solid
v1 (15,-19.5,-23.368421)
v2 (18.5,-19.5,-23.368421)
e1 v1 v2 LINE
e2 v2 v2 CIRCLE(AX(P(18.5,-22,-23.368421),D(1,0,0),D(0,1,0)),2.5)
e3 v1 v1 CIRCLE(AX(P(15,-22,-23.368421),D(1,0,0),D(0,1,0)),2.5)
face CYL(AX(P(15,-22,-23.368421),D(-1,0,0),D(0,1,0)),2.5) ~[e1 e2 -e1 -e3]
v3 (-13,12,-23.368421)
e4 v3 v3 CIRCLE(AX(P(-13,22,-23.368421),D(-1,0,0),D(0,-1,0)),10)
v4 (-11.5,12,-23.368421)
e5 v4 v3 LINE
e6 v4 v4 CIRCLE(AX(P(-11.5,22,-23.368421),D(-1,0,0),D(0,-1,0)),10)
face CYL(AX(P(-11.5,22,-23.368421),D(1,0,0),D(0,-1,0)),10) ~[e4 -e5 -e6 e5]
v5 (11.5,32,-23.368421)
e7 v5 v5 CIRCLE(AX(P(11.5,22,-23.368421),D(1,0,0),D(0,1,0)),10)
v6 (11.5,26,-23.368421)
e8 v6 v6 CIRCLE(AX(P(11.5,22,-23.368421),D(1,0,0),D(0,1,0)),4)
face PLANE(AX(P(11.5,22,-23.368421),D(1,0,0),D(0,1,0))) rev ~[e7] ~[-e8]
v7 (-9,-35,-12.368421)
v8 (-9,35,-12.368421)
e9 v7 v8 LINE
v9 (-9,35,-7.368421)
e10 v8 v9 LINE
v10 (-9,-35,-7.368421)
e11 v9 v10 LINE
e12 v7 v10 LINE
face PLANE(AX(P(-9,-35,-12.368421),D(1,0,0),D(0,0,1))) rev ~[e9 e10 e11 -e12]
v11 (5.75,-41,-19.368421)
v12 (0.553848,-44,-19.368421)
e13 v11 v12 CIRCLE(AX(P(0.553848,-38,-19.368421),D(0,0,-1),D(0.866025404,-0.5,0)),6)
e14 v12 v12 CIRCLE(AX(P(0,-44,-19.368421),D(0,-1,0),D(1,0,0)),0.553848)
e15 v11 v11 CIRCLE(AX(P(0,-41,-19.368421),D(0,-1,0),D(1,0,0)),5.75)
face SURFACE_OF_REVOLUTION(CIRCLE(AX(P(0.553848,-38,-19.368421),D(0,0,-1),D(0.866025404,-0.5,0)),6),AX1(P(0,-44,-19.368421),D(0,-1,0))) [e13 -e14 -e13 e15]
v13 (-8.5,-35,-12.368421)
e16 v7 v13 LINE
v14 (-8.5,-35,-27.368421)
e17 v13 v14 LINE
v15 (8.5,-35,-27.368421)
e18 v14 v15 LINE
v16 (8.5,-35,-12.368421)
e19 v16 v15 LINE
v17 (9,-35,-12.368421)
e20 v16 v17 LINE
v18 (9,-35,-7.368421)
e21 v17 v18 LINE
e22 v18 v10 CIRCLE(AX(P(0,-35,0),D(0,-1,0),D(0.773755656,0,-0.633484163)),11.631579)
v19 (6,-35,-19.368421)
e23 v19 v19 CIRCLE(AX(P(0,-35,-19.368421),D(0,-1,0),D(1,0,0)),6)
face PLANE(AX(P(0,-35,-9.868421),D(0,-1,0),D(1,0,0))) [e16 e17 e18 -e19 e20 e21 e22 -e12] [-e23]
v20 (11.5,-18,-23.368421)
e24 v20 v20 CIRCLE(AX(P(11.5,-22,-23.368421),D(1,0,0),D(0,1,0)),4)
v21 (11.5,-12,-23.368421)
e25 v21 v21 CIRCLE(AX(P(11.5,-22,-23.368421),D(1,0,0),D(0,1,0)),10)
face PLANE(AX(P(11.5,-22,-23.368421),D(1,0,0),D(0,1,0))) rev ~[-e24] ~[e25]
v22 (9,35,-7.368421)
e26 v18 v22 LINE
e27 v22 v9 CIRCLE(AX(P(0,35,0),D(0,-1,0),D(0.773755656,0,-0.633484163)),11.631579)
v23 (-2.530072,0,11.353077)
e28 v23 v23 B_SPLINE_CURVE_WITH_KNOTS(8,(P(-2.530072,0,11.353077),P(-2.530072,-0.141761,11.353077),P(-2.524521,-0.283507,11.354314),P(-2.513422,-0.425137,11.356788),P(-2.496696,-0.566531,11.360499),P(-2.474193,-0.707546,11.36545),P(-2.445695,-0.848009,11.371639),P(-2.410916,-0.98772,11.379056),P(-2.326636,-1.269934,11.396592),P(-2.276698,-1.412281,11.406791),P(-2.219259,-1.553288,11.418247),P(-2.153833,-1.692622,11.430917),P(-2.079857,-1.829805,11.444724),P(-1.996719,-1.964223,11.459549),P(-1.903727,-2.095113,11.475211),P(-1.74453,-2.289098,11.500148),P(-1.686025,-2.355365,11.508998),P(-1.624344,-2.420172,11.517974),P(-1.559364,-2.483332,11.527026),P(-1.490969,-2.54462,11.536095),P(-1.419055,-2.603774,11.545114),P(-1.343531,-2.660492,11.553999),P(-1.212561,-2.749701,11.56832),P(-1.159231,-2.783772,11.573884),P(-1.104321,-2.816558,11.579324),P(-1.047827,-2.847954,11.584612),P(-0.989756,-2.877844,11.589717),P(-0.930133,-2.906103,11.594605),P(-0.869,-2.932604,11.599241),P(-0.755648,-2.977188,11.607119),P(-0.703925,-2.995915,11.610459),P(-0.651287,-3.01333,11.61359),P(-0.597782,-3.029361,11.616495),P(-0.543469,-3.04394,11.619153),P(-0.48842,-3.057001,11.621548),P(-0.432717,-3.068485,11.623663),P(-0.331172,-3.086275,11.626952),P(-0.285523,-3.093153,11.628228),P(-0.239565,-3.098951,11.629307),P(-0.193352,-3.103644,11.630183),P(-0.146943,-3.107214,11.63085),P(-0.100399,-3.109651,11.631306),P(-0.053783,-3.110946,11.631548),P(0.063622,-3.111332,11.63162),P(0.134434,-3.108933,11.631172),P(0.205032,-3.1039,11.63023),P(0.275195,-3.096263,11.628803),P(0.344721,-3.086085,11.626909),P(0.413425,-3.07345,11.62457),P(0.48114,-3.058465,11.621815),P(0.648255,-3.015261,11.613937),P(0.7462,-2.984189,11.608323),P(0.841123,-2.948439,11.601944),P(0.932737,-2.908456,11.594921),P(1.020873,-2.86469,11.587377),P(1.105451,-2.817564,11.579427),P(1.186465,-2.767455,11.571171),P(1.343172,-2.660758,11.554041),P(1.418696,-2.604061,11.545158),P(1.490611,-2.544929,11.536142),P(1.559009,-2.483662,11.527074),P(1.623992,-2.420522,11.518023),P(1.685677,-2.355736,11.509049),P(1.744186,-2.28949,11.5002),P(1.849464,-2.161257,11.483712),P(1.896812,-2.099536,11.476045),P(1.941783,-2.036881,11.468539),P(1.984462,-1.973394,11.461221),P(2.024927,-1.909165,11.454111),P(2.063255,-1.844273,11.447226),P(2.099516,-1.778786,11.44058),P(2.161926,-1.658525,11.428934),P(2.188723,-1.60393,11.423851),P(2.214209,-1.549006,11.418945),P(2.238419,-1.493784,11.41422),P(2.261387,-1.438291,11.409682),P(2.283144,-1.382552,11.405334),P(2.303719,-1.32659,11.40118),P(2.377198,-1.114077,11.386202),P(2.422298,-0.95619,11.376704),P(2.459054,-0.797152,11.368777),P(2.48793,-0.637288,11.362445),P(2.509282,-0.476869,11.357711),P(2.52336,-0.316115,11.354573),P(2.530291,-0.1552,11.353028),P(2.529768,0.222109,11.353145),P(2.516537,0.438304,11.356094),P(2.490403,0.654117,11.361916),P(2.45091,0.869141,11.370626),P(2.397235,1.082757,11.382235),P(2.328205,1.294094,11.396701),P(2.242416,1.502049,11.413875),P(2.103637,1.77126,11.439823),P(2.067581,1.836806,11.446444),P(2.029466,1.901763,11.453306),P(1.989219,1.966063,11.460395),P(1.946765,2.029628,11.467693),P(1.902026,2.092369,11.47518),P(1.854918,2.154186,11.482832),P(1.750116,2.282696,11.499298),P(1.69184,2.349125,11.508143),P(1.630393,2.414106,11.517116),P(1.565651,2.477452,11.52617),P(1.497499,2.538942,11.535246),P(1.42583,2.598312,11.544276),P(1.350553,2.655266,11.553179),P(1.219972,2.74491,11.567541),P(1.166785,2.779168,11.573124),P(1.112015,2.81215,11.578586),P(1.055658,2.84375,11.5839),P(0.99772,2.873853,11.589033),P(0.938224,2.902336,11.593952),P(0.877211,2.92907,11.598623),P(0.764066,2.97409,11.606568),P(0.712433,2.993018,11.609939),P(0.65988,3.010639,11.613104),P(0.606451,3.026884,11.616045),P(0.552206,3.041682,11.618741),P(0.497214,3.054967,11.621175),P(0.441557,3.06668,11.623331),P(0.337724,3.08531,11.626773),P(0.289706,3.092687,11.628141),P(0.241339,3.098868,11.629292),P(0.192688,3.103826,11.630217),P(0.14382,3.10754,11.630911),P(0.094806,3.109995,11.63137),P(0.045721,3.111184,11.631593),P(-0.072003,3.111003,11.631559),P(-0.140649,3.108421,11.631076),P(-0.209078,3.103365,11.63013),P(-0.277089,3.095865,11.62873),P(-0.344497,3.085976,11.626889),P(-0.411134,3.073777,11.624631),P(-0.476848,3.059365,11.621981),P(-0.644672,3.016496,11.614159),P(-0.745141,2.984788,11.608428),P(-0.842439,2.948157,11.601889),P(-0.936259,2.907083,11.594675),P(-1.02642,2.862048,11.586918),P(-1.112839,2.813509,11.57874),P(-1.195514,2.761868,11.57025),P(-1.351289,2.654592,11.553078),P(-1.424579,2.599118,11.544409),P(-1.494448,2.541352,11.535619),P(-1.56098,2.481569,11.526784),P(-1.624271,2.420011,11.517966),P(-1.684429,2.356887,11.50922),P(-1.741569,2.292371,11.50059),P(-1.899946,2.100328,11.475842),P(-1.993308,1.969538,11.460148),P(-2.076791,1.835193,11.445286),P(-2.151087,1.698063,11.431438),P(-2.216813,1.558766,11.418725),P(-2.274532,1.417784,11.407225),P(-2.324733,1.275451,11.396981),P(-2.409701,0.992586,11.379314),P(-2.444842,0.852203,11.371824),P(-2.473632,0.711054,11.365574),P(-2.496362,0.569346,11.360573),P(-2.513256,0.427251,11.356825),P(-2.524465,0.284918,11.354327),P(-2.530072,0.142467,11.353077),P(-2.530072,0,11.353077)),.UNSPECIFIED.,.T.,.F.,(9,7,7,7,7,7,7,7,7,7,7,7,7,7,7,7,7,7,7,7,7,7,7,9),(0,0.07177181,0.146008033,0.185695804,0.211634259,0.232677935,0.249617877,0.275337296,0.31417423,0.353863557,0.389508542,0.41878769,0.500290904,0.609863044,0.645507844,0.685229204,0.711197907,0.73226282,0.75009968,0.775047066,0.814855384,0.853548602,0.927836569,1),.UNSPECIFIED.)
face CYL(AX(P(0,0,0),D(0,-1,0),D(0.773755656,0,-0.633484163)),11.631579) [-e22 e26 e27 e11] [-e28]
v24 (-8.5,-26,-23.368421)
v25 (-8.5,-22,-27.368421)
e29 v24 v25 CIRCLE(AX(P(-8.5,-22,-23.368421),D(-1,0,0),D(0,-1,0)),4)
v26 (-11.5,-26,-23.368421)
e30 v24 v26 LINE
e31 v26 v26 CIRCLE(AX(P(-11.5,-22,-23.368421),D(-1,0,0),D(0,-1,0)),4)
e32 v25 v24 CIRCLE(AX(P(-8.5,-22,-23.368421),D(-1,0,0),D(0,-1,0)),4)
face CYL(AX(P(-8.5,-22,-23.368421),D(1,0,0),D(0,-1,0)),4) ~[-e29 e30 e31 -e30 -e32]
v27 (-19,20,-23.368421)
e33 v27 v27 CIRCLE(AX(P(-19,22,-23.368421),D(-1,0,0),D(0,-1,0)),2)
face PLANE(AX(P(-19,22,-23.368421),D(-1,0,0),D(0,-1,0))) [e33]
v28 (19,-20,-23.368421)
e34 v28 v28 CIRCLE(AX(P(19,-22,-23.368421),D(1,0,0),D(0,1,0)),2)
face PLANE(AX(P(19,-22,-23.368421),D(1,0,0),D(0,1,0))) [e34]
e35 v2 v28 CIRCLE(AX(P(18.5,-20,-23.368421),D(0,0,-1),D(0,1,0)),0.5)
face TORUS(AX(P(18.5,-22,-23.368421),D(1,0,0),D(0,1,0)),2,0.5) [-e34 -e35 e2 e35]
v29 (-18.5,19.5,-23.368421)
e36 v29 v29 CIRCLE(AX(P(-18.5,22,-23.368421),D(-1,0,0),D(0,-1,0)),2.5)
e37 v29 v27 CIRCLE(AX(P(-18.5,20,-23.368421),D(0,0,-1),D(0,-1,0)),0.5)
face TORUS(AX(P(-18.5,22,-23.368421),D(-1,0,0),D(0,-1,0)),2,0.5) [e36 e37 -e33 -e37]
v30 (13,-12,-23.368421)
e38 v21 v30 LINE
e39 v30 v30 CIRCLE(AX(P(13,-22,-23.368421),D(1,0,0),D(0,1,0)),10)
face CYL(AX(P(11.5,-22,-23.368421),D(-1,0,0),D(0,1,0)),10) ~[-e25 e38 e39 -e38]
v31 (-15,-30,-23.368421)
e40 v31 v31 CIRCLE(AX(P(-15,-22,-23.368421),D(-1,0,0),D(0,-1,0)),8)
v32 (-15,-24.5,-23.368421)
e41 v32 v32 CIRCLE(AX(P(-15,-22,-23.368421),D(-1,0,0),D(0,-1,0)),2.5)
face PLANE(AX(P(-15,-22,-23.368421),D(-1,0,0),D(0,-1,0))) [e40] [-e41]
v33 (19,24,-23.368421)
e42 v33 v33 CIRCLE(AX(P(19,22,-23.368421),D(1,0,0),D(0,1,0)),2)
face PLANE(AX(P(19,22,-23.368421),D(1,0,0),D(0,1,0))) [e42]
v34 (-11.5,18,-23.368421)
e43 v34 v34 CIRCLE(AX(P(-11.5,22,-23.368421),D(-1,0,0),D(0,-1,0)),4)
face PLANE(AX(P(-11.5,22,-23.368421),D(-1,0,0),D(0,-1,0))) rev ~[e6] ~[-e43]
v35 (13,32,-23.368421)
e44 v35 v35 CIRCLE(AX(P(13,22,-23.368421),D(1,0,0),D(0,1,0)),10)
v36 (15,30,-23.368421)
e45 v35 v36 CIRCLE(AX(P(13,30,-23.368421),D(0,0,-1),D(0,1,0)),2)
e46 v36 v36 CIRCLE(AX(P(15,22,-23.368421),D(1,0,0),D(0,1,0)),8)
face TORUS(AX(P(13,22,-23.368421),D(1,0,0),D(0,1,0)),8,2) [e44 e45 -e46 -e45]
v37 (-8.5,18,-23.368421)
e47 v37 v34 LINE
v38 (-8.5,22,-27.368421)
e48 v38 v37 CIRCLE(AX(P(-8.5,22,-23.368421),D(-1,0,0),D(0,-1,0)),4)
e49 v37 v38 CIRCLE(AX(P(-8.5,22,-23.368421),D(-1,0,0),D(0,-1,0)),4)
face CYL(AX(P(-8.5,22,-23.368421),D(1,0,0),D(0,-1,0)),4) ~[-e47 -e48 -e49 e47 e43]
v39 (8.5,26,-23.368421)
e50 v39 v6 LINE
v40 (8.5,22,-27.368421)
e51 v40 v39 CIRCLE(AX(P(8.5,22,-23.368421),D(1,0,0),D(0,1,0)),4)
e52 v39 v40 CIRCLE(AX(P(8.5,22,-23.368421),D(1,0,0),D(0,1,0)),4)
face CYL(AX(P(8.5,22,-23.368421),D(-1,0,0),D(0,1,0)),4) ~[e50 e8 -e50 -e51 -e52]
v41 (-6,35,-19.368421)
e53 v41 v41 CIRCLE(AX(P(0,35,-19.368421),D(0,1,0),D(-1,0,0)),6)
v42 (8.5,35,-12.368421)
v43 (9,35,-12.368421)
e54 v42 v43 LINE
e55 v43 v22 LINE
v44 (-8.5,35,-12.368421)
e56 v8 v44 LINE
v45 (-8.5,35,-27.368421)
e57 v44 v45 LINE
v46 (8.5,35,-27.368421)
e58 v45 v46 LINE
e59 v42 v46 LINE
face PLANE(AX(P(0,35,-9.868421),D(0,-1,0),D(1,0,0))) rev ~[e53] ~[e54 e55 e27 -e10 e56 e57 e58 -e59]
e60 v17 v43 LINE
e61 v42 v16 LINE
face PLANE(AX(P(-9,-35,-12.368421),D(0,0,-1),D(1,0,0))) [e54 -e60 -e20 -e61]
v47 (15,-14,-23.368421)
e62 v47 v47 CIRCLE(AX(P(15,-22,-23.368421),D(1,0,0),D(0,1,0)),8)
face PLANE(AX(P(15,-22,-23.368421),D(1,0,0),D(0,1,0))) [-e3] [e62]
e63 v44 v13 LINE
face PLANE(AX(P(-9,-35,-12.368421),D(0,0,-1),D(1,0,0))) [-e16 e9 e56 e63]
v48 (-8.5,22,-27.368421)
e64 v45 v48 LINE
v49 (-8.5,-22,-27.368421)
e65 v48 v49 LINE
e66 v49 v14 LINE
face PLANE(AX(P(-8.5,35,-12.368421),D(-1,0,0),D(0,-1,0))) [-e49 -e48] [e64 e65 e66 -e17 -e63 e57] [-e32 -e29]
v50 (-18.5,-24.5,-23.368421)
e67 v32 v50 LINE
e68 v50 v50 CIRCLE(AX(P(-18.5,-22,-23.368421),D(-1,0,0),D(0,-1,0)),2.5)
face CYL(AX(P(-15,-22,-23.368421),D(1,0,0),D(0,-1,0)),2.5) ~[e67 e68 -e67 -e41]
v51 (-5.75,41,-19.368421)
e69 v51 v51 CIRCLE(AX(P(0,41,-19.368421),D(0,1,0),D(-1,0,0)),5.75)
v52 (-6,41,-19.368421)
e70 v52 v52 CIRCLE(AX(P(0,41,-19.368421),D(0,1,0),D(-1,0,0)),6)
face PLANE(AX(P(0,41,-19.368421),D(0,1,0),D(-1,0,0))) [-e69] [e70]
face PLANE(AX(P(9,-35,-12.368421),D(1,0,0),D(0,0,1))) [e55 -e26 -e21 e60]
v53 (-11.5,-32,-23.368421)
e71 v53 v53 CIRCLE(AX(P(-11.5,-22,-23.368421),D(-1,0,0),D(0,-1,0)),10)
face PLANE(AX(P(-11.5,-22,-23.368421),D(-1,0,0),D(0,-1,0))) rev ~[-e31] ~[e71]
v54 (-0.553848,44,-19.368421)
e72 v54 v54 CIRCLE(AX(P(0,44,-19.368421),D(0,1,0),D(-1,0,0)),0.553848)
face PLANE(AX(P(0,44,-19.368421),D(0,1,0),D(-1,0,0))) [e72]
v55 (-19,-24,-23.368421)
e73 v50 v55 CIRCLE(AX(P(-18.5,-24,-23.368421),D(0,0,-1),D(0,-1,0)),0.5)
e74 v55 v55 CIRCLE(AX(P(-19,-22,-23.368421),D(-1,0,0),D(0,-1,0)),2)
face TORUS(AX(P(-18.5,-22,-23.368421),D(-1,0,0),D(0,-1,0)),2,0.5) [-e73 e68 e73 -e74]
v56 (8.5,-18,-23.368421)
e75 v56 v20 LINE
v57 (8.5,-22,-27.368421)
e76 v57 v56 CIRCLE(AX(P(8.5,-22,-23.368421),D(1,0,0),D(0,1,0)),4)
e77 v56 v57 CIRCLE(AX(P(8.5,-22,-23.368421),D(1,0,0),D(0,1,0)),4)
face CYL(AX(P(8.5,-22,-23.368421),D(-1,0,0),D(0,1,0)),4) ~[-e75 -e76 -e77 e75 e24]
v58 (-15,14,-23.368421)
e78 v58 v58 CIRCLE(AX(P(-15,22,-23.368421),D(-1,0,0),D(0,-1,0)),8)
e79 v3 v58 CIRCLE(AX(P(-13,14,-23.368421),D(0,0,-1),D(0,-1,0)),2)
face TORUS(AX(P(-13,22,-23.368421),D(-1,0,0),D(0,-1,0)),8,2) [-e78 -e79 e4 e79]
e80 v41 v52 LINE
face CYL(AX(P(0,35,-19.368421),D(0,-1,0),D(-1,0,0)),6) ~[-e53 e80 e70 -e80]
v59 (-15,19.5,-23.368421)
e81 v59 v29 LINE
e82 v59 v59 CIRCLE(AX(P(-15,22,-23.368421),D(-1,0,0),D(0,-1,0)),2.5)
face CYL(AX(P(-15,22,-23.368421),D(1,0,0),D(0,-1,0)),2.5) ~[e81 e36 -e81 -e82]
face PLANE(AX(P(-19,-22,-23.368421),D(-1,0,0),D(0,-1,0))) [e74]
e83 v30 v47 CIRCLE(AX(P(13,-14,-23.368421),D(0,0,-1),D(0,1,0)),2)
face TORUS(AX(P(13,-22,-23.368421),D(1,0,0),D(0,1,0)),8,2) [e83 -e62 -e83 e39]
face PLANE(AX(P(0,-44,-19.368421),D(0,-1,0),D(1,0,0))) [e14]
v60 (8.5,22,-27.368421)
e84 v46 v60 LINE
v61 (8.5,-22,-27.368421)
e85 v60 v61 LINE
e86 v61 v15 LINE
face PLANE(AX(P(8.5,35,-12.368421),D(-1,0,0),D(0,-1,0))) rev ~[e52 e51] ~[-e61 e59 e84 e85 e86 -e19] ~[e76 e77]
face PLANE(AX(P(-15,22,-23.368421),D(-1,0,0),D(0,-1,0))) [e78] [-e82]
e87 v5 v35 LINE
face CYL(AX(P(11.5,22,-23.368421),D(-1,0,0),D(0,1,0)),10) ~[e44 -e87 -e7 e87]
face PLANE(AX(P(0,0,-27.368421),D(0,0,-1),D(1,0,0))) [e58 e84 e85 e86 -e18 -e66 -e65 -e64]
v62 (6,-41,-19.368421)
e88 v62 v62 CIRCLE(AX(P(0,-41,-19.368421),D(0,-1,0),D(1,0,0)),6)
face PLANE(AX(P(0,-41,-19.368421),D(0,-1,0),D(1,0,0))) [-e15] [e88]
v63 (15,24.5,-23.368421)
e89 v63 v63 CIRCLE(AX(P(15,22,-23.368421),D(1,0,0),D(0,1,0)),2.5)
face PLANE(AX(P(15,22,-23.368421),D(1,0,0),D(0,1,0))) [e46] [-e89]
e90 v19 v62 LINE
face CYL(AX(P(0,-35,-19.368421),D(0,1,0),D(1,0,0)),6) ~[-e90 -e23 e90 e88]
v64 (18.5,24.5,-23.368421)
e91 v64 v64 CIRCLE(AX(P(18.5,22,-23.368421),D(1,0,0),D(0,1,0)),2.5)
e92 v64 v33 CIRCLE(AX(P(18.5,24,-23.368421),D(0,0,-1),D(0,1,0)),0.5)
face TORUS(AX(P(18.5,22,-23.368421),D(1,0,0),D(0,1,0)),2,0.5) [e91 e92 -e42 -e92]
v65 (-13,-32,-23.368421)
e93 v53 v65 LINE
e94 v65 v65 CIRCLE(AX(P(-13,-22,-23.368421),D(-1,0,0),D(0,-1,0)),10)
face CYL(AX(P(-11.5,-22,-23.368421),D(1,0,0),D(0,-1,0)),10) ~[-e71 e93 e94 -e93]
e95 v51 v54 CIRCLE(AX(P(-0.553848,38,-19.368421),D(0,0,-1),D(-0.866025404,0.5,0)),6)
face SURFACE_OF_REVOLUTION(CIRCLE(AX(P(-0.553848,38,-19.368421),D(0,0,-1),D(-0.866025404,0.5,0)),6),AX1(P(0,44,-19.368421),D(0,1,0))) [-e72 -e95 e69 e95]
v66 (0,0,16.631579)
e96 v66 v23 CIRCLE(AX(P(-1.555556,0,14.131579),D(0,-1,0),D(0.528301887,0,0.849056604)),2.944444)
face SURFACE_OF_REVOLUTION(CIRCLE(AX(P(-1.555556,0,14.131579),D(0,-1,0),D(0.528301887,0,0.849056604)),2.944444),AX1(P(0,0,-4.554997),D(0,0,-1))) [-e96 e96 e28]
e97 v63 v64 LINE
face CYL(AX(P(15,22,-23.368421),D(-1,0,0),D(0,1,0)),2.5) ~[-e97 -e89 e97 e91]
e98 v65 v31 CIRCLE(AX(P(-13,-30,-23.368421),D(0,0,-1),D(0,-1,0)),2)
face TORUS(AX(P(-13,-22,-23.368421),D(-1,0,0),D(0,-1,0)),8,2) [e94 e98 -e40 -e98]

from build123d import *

# Parameters (mm, degrees)
F1_DEPTH  = 35
F2_W      = 18
F2_H      = 5
F3_DEPTH  = 70
F5_W      = 17
F5_H      = 70
F6_DEPTH  = 15
F7_R      = 6
F8_DEPTH  = 6
F9_R      = 6
F10_DEPTH = 6
F13_R     = 4
F14_DEPTH = 3
F15_R     = 4
F16_DEPTH = 3
F17_R     = 4
F18_DEPTH = 3
F19_R     = 4
F20_DEPTH = 3
F21_R     = 10
F22_DEPTH = 3.5
F23_R     = 10
F24_DEPTH = 3.5
F25_R     = 10
F26_DEPTH = 3.5
F27_R     = 10
F28_DEPTH = 3.5
F29_R     = 2.5
F30_DEPTH = 4
F31_R     = 2.5
F32_DEPTH = 4
F33_R     = 2.5
F34_DEPTH = 4
F35_R     = 2.5
F36_DEPTH = 4
F37_R     = 2
F38_R     = 2
F39_R     = 2
F40_R     = 2
F41_R     = 5.75
F42_DEPTH = 3
F44_R     = 5.75
F45_DEPTH = 3
F47_R     = 0.5
F48_R     = 0.5
F49_R     = 0.5
F50_R     = 0.5


# Not quite as in the source:
# - a fillet or chamfer that OpenCascade refuses, or shapes differently, is made with other operations: its cross-section is extruded or revolved along the edge and cut away or added


with BuildPart() as f1:
    # F0 (on Front) → F1 (new body, symmetric)
    with BuildSketch(Plane.XZ):
        with BuildLine():
            ThreePointArc((9, -7.3684210526), (0, 11.6315789474), (-9, -7.3684210526))
            Line((-9, -7.3684210526), (9, -7.3684210526))
        make_face()
    extrude(amount=F1_DEPTH, both=True)

    # F2 (on face) → F3 (join)
    with BuildSketch(Plane.XZ.offset(35)):
        with Locations((0, -9.8684210526)):
            Rectangle(F2_W, F2_H)
    extrude(amount=-F3_DEPTH)

    # F4: union 

    # F5 (on face) → F6 (join)
    with BuildSketch(Plane(origin=(0, 0, -12.3684210526), x_dir=(1, 0, 0), z_dir=(0, 0, -1))):
        Rectangle(F5_W, F5_H)
    extrude(amount=F6_DEPTH)

    # F7 (on face) → F8 (join)
    with BuildSketch(Plane.XZ.offset(35)):
        with Locations((0, -19.3684210526)):
            Circle(F7_R)
    extrude(amount=F8_DEPTH)

    # F9 (on face) → F10 (join)
    with BuildSketch(Plane(origin=(0, 35, 0), x_dir=(-1, 0, 0), z_dir=(0, 1, 0))):
        with Locations((0, -19.3684210526)):
            Circle(F9_R)
    extrude(amount=F10_DEPTH)

    # F11 (on Front) → F12 (revolve)
    with BuildSketch(Plane.XZ):
        with BuildLine():
            ThreePointArc((0, 16.6315789474), (-4.5, 14.1315789474), (0, 11.6315789474))
            Line((0, 11.6315789474), (0, 16.6315789474))
        make_face()
    revolve(axis=Axis((0, 0, -4.5549966032), (0, 0, -1)))

    # F13 (on face) → F14 (join)
    with BuildSketch(Plane.YZ.offset(8.5)):
        with Locations((-22, -23.3684210526)):
            Circle(F13_R)
    extrude(amount=F14_DEPTH)

    # F15 (on face) → F16 (join)
    with BuildSketch(Plane.YZ.offset(8.5)):
        with Locations((22, -23.3684210526)):
            Circle(F15_R)
    extrude(amount=F16_DEPTH)

    # F17 (on face) → F18 (join)
    with BuildSketch(Plane(origin=(-8.5, 0, 0), x_dir=(0, -1, 0), z_dir=(-1, 0, 0))):
        with Locations((22, -23.3684210526)):
            Circle(F17_R)
    extrude(amount=F18_DEPTH)

    # F19 (on face) → F20 (join)
    with BuildSketch(Plane(origin=(-8.5, 0, 0), x_dir=(0, -1, 0), z_dir=(-1, 0, 0))):
        with Locations((-22, -23.3684210526)):
            Circle(F19_R)
    extrude(amount=F20_DEPTH)

    # F21 (on face) → F22 (join)
    with BuildSketch(Plane(origin=(-11.5, 0, 0), x_dir=(0, -1, 0), z_dir=(-1, 0, 0))):
        with Locations((-22, -23.3684210526)):
            Circle(F21_R)
    extrude(amount=F22_DEPTH)

    # F23 (on face) → F24 (join)
    with BuildSketch(Plane(origin=(-11.5, 0, 0), x_dir=(0, -1, 0), z_dir=(-1, 0, 0))):
        with Locations((22, -23.3684210526)):
            Circle(F23_R)
    extrude(amount=F24_DEPTH)

    # F25 (on face) → F26 (join)
    with BuildSketch(Plane.YZ.offset(11.5)):
        with Locations((-22, -23.3684210526)):
            Circle(F25_R)
    extrude(amount=F26_DEPTH)

    # F27 (on face) → F28 (join)
    with BuildSketch(Plane.YZ.offset(11.5)):
        with Locations((22, -23.3684210526)):
            Circle(F27_R)
    extrude(amount=F28_DEPTH)

    # F29 (on face) → F30 (join)
    with BuildSketch(Plane.YZ.offset(15)):
        with Locations((-22, -23.3684210526)):
            Circle(F29_R)
    extrude(amount=F30_DEPTH)

    # F31 (on face) → F32 (join)
    with BuildSketch(Plane.YZ.offset(15)):
        with Locations((22, -23.3684210526)):
            Circle(F31_R)
    extrude(amount=F32_DEPTH)

    # F33 (on face) → F34 (join)
    with BuildSketch(Plane(origin=(-15, 0, 0), x_dir=(0, -1, 0), z_dir=(-1, 0, 0))):
        with Locations((-22, -23.3684210526)):
            Circle(F33_R)
    extrude(amount=F34_DEPTH)

    # F35 (on face) → F36 (join)
    with BuildSketch(Plane(origin=(-15, 0, 0), x_dir=(0, -1, 0), z_dir=(-1, 0, 0))):
        with Locations((22, -23.3684210526)):
            Circle(F35_R)
    extrude(amount=F36_DEPTH)

    # F37
    f37_edges = [f1.edges().sort_by_distance(p)[0] for p in [
        (-15, 32, -23.368421),
    ]]
    fillet(f37_edges, radius=F37_R)

    # F38
    f38_edges = [f1.edges().sort_by_distance(p)[0] for p in [
        (-15, -12, -23.368421),
    ]]
    fillet(f38_edges, radius=F38_R)

    # F39
    f39_edges = [f1.edges().sort_by_distance(p)[0] for p in [
        (15, -32, -23.368421),
    ]]
    fillet(f39_edges, radius=F39_R)

    # F40
    f40_edges = [f1.edges().sort_by_distance(p)[0] for p in [
        (15, 12, -23.368421),
    ]]
    fillet(f40_edges, radius=F40_R)

    # F41 (on face) → F42 (join)
    with BuildSketch(Plane(origin=(0, 41, 0), x_dir=(-1, 0, 0), z_dir=(0, 1, 0))):
        with Locations((0, -19.3684210526)):
            Circle(F41_R)
    extrude(amount=F42_DEPTH)

    # F43: fillet of radius 6 on 1 edges, made by hand

    # F43_s1 → F43_t2 (revolve, cut)
    with BuildSketch(Plane.XY.offset(-19.3684210526)):
        with BuildLine():
            ThreePointArc((-5.75, 41), (-3.5538475773, 43.1961524227), (-0.5538475773, 44))
            Line((-0.5538475773, 44), (-5.75, 44))
            Line((-5.75, 44), (-5.75, 41))
        make_face()
    revolve(axis=Axis((0, 44, -19.3684210526), (0, 1, 0)), mode=Mode.SUBTRACT)

    # F44 (on face) → F45 (join)
    with BuildSketch(Plane.XZ.offset(41)):
        with Locations((0, -19.3684210526)):
            Circle(F44_R)
    extrude(amount=F45_DEPTH)

    # F46: fillet of radius 6 on 1 edges, made by hand

    # F46_s1 → F46_t2 (revolve, cut)
    with BuildSketch(Plane.XY.offset(-19.3684210526)):
        with BuildLine():
            ThreePointArc((5.75, -41), (3.5538475773, -43.1961524227), (0.5538475773, -44))
            Line((0.5538475773, -44), (5.75, -44))
            Line((5.75, -44), (5.75, -41))
        make_face()
    revolve(axis=Axis((0, -44, -19.3684210526), (0, -1, 0)), mode=Mode.SUBTRACT)

    # F47
    f47_edges = [f1.edges().sort_by_distance(p)[0] for p in [
        (-19, -19.5, -23.368421),
    ]]
    fillet(f47_edges, radius=F47_R)

    # F48
    f48_edges = [f1.edges().sort_by_distance(p)[0] for p in [
        (-19, 24.5, -23.368421),
    ]]
    fillet(f48_edges, radius=F48_R)

    # F49
    f49_edges = [f1.edges().sort_by_distance(p)[0] for p in [
        (19, -24.5, -23.368421),
    ]]
    fillet(f49_edges, radius=F49_R)

    # F50
    f50_edges = [f1.edges().sort_by_distance(p)[0] for p in [
        (19, 19.5, -23.368421),
    ]]
    fillet(f50_edges, radius=F50_R)


solid = f1.part
